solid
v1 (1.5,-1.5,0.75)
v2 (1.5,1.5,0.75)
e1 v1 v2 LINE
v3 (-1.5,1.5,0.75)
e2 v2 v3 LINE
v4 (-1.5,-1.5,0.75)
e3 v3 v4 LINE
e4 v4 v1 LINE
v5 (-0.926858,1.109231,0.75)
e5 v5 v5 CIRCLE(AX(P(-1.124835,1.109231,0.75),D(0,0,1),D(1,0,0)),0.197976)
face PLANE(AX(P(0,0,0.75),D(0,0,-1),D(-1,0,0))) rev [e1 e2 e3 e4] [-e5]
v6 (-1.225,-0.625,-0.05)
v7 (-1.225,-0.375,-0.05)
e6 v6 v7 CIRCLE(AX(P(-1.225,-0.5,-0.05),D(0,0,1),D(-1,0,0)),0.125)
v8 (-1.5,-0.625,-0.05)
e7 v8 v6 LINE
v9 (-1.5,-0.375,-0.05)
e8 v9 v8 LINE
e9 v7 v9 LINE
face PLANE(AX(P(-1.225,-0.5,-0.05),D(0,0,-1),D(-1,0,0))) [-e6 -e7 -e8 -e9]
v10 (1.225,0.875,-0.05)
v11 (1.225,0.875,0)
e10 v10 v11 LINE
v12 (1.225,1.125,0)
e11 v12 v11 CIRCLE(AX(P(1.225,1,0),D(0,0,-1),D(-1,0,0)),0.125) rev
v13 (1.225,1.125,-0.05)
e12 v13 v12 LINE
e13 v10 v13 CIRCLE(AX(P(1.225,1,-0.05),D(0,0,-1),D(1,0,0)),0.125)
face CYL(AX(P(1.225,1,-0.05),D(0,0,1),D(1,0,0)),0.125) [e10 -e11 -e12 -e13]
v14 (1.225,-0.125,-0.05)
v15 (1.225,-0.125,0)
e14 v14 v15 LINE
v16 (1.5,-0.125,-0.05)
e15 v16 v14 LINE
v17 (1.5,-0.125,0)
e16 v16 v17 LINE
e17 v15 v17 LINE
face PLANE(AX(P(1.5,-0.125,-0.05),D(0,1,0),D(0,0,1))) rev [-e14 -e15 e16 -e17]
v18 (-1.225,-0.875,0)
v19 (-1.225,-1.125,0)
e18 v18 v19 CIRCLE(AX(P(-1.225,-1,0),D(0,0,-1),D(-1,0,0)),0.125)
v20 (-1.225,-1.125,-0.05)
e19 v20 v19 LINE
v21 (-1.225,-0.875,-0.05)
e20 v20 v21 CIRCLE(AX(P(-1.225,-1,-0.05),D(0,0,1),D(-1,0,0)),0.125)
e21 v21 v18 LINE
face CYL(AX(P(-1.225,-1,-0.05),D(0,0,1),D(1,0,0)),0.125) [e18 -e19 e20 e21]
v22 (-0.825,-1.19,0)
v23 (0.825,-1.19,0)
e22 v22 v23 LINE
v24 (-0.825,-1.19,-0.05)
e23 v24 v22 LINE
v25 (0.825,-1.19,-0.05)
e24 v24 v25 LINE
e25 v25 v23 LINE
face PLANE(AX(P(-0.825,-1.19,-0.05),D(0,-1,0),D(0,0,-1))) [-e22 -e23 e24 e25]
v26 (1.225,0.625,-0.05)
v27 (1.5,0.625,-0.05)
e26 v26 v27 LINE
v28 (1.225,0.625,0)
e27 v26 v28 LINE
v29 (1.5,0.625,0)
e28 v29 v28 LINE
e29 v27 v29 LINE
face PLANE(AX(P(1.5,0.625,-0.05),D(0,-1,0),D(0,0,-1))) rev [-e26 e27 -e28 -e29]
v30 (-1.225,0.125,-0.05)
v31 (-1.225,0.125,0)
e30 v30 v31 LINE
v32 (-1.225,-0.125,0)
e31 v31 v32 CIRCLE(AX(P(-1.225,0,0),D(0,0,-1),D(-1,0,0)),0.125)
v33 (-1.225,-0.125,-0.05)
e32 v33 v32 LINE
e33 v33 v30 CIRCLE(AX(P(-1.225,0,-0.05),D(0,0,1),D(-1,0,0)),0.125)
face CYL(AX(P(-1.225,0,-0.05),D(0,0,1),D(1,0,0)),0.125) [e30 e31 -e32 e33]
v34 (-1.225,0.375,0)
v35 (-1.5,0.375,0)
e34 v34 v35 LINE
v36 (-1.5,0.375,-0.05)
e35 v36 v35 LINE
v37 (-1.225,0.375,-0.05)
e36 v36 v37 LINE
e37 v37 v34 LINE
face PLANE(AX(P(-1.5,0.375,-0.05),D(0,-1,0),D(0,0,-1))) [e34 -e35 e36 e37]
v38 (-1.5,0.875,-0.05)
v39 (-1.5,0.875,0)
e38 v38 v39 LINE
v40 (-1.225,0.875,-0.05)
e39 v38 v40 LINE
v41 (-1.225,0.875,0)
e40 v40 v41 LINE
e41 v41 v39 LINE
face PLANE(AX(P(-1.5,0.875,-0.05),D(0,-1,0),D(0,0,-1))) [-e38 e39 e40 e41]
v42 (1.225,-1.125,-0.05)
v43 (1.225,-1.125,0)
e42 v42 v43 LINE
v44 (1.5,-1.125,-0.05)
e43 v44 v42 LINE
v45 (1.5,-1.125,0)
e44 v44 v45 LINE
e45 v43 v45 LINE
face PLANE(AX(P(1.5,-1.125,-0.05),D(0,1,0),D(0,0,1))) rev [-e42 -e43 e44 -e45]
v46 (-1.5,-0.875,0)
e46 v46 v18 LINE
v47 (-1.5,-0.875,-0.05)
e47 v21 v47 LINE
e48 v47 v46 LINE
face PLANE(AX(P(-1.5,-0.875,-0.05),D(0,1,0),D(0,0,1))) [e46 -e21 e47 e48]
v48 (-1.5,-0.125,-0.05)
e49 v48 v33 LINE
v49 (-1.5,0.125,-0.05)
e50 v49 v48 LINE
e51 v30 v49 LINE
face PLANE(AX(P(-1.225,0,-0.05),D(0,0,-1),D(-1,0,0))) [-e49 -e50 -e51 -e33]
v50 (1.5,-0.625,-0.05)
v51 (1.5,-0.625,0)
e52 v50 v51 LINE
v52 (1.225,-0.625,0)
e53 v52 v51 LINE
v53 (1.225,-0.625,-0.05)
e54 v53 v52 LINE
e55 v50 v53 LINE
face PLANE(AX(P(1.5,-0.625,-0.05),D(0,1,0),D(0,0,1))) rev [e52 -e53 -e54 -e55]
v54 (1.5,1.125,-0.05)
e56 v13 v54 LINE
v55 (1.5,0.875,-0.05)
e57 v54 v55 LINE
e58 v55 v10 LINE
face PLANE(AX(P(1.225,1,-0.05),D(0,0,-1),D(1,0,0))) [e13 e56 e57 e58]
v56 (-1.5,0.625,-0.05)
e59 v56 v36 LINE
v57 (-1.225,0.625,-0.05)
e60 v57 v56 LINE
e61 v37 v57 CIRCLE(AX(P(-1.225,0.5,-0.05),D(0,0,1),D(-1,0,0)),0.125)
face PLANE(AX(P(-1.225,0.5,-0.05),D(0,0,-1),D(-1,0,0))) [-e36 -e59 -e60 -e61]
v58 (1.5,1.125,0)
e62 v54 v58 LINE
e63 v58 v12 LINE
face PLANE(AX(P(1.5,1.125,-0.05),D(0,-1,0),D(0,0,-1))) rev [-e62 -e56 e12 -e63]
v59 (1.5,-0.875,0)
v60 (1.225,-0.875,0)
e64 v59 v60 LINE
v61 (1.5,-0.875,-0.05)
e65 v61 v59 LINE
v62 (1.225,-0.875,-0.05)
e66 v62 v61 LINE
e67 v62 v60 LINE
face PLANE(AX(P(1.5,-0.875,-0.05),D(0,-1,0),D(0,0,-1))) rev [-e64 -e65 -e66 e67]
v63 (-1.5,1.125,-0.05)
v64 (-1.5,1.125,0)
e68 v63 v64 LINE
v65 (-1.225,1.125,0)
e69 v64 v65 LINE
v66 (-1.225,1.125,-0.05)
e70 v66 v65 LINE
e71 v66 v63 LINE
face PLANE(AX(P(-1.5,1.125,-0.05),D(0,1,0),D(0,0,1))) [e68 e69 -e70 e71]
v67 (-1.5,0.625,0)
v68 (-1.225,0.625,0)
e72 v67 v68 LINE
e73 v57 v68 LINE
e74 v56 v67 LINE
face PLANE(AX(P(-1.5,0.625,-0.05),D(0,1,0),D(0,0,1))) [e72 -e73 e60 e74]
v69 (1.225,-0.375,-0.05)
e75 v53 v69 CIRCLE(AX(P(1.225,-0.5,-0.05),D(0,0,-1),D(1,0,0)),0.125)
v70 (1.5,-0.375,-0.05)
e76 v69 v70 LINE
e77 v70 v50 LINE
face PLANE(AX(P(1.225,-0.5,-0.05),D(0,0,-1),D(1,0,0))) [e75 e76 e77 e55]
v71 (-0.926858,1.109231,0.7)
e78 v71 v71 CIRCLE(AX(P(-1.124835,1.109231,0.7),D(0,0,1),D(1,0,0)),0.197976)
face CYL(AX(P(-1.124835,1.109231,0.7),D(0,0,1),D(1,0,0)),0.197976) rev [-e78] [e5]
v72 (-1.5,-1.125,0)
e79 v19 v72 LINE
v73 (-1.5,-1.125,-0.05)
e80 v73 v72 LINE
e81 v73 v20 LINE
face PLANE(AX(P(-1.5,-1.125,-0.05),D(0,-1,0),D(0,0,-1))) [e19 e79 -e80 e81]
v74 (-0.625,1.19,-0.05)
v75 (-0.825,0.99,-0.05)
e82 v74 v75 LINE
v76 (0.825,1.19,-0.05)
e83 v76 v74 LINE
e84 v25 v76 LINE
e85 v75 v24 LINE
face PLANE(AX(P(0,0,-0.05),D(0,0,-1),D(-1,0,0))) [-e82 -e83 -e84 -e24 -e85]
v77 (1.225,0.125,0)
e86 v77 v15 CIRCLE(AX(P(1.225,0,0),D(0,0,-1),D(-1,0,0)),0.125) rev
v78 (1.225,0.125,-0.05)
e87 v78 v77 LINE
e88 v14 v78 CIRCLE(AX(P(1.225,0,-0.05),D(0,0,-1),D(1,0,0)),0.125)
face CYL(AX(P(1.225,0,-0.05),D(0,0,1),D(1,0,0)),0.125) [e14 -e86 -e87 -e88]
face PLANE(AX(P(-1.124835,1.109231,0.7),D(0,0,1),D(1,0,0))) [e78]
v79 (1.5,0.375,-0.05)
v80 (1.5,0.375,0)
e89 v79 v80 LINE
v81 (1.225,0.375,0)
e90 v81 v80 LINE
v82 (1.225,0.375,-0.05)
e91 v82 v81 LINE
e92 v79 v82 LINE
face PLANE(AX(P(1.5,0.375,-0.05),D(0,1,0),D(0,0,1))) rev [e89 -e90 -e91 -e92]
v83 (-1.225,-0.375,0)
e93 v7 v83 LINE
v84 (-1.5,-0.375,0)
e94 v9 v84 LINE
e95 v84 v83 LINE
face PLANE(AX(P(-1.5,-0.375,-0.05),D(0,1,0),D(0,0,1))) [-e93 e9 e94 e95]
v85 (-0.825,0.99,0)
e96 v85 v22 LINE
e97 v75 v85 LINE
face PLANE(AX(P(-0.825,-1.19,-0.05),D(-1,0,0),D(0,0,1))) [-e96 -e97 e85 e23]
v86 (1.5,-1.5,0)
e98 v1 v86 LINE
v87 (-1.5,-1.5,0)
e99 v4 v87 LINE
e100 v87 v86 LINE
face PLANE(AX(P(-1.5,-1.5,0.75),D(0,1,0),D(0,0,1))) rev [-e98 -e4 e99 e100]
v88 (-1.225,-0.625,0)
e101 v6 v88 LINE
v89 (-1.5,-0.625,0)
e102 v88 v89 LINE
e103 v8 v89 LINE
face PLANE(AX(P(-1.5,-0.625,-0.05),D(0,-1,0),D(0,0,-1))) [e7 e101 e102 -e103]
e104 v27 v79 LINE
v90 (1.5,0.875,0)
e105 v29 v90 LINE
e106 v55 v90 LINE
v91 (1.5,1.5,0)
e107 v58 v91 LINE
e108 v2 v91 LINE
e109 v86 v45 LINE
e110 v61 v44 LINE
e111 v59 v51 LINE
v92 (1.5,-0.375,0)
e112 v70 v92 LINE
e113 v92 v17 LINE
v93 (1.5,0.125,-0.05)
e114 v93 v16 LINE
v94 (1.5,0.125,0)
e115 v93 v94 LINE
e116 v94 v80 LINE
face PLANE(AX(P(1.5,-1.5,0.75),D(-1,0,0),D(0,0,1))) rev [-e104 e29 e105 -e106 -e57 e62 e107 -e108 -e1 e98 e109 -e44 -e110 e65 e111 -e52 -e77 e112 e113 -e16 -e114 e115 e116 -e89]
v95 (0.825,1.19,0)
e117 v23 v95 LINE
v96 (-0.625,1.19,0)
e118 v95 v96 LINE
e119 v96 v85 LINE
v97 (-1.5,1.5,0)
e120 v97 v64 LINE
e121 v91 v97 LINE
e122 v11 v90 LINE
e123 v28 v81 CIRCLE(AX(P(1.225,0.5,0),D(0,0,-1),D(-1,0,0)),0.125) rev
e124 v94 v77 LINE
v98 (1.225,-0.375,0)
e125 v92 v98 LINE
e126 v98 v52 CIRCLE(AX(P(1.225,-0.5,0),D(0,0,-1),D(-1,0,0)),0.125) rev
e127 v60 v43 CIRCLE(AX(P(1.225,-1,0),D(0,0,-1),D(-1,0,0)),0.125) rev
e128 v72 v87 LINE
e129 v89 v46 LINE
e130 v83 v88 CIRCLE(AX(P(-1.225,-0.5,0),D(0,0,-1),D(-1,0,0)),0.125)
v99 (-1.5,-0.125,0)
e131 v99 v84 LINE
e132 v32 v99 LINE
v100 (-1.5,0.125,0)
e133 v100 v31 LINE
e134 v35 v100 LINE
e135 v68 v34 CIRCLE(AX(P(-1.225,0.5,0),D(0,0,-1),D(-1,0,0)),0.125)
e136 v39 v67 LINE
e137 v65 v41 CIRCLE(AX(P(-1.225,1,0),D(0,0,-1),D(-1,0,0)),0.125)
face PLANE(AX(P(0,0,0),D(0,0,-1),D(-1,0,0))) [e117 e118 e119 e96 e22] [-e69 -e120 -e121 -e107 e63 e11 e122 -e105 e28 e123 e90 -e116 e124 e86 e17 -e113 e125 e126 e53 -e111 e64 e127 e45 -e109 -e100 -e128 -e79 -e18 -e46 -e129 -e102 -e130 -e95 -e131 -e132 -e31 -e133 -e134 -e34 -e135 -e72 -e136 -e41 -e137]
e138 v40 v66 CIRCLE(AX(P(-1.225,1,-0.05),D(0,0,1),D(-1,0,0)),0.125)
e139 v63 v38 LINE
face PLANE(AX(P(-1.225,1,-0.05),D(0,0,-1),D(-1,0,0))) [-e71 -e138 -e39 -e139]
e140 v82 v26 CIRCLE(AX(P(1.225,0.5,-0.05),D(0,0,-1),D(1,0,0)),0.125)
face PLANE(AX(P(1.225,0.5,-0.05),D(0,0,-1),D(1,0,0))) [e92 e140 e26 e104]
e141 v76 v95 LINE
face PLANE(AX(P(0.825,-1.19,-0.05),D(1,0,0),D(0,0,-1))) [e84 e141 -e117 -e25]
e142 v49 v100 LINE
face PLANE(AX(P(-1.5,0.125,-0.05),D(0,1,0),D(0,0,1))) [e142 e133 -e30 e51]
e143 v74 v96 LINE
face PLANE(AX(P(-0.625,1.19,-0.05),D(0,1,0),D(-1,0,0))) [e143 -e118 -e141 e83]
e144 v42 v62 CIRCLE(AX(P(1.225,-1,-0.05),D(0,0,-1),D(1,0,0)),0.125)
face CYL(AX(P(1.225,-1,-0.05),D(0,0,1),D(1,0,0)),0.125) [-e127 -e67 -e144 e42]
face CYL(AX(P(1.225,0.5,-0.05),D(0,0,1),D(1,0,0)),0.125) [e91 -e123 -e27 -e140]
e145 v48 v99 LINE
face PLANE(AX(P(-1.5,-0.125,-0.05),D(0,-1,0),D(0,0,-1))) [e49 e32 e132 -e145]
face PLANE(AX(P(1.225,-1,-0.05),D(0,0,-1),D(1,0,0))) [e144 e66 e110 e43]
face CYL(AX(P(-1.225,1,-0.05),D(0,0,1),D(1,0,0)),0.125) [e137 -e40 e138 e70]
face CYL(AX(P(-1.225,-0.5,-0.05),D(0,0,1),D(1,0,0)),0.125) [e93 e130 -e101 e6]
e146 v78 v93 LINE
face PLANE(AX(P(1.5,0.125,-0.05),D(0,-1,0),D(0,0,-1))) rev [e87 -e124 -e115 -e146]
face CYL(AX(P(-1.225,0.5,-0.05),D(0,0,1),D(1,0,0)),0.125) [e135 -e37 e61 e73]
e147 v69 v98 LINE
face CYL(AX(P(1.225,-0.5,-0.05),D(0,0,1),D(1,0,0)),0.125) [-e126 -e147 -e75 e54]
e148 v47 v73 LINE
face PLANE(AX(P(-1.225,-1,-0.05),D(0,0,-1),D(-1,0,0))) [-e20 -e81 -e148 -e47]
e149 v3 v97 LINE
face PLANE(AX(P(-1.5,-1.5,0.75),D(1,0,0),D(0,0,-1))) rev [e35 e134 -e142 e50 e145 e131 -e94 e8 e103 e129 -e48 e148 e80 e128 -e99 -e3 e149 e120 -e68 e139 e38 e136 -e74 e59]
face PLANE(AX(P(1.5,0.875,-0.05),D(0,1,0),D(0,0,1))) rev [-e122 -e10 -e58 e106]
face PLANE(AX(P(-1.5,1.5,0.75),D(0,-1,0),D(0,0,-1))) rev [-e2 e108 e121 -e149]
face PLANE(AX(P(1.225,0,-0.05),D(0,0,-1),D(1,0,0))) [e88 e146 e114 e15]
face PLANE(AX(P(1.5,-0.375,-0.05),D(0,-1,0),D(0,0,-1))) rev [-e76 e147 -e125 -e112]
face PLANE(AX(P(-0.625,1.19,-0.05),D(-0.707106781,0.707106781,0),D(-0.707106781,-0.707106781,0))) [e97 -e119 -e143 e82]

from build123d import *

# Parameters (mm, degrees)
SKETCH1_W           = 3
SKETCH1_H           = 3
BOSS_EXTRUDE1_DEPTH = 0.75
BOSS_EXTRUDE2_START = -0.05
BOSS_EXTRUDE2_DEPTH = 0.25
LPATTERN1_START     = -0.05
LPATTERN1_DEPTH     = 0.05
LPATTERN2_START     = -0.05
LPATTERN2_DEPTH     = 0.05
SKETCH3_R           = 0.197976387
CUT_EXTRUDE1_DEPTH  = 0.05
BOSS_EXTRUDE3_DEPTH = 0.05


with BuildPart() as part:
    # Sketch1 → Boss-Extrude1 (new body)
    with BuildSketch(Plane.XY):
        Rectangle(SKETCH1_W, SKETCH1_H)
    extrude(amount=BOSS_EXTRUDE1_DEPTH)

    # Sketch2 → Boss-Extrude2 (add)
    with BuildSketch(Plane.XY.offset(BOSS_EXTRUDE2_START)):
        with BuildLine():
            Line((-1.5, -0.125), (-1.225, -0.125))
            ThreePointArc((-1.225, -0.125), (-1.1, 0), (-1.225, 0.125))
            Line((-1.225, 0.125), (-1.5, 0.125))
            Line((-1.5, 0.125), (-1.5, -0.125))
        make_face()
    boss_extrude2 = extrude(amount=BOSS_EXTRUDE2_DEPTH)

    # LPattern1: read off the stored shape, not the designer's step
    # LPattern1 outline → LPattern1 (add)
    with BuildSketch(Plane.XY.offset(LPATTERN1_START)):
        with BuildLine():
            Line((-1.5, 0.375), (-1.225, 0.375))
            ThreePointArc((-1.225, 0.375), (-1.1, 0.5), (-1.225, 0.625))
            Line((-1.225, 0.625), (-1.5, 0.625))
            Line((-1.5, 0.625), (-1.5, 0.375))
        make_face()
        with BuildLine():
            Line((-1.5, 1.125), (-1.5, 0.875))
            Line((-1.5, 0.875), (-1.225, 0.875))
            ThreePointArc((-1.225, 0.875), (-1.1, 1), (-1.225, 1.125))
            Line((-1.225, 1.125), (-1.5, 1.125))
        make_face()
    lpattern1 = extrude(amount=LPATTERN1_DEPTH)

    # LPattern2: read off the stored shape, not the designer's step
    # LPattern2 outline → LPattern2 (add)
    with BuildSketch(Plane.XY.offset(LPATTERN2_START)):
        with BuildLine():
            Line((-1.5, -0.625), (-1.225, -0.625))
            ThreePointArc((-1.225, -0.625), (-1.1, -0.5), (-1.225, -0.375))
            Line((-1.225, -0.375), (-1.5, -0.375))
            Line((-1.5, -0.375), (-1.5, -0.625))
        make_face()
        with BuildLine():
            Line((-1.225, -0.875), (-1.5, -0.875))
            Line((-1.5, -0.875), (-1.5, -1.125))
            Line((-1.5, -1.125), (-1.225, -1.125))
            ThreePointArc((-1.225, -1.125), (-1.1, -1), (-1.225, -0.875))
        make_face()
    lpattern2 = extrude(amount=LPATTERN2_DEPTH)

    # Mirror1: Boss-Extrude2, LPattern1, LPattern2 across plane
    add(boss_extrude2.mirror(Plane(origin=(0, 0, 0), x_dir=(0, 0, 1), z_dir=(1, 0, 0))))
    add(lpattern1.mirror(Plane(origin=(0, 0, 0), x_dir=(0, 0, 1), z_dir=(1, 0, 0))))
    add(lpattern2.mirror(Plane(origin=(0, 0, 0), x_dir=(0, 0, 1), z_dir=(1, 0, 0))))

    # Sketch3 → Cut-Extrude1 (cut)
    with BuildSketch(Plane.XY.offset(0.75)):
        with Locations((-1.124834532, 1.109231375)):
            Circle(SKETCH3_R)
    extrude(amount=-CUT_EXTRUDE1_DEPTH, mode=Mode.SUBTRACT)

    # Sketch4 → Boss-Extrude3 (add)
    with BuildSketch(Plane.XY):
        Polygon((-0.625, 1.19), (-0.825, 0.99), (-0.825, -1.19), (0.825, -1.19), (0.825, 1.19), align=None)
    extrude(amount=-BOSS_EXTRUDE3_DEPTH)


solid = part.part
